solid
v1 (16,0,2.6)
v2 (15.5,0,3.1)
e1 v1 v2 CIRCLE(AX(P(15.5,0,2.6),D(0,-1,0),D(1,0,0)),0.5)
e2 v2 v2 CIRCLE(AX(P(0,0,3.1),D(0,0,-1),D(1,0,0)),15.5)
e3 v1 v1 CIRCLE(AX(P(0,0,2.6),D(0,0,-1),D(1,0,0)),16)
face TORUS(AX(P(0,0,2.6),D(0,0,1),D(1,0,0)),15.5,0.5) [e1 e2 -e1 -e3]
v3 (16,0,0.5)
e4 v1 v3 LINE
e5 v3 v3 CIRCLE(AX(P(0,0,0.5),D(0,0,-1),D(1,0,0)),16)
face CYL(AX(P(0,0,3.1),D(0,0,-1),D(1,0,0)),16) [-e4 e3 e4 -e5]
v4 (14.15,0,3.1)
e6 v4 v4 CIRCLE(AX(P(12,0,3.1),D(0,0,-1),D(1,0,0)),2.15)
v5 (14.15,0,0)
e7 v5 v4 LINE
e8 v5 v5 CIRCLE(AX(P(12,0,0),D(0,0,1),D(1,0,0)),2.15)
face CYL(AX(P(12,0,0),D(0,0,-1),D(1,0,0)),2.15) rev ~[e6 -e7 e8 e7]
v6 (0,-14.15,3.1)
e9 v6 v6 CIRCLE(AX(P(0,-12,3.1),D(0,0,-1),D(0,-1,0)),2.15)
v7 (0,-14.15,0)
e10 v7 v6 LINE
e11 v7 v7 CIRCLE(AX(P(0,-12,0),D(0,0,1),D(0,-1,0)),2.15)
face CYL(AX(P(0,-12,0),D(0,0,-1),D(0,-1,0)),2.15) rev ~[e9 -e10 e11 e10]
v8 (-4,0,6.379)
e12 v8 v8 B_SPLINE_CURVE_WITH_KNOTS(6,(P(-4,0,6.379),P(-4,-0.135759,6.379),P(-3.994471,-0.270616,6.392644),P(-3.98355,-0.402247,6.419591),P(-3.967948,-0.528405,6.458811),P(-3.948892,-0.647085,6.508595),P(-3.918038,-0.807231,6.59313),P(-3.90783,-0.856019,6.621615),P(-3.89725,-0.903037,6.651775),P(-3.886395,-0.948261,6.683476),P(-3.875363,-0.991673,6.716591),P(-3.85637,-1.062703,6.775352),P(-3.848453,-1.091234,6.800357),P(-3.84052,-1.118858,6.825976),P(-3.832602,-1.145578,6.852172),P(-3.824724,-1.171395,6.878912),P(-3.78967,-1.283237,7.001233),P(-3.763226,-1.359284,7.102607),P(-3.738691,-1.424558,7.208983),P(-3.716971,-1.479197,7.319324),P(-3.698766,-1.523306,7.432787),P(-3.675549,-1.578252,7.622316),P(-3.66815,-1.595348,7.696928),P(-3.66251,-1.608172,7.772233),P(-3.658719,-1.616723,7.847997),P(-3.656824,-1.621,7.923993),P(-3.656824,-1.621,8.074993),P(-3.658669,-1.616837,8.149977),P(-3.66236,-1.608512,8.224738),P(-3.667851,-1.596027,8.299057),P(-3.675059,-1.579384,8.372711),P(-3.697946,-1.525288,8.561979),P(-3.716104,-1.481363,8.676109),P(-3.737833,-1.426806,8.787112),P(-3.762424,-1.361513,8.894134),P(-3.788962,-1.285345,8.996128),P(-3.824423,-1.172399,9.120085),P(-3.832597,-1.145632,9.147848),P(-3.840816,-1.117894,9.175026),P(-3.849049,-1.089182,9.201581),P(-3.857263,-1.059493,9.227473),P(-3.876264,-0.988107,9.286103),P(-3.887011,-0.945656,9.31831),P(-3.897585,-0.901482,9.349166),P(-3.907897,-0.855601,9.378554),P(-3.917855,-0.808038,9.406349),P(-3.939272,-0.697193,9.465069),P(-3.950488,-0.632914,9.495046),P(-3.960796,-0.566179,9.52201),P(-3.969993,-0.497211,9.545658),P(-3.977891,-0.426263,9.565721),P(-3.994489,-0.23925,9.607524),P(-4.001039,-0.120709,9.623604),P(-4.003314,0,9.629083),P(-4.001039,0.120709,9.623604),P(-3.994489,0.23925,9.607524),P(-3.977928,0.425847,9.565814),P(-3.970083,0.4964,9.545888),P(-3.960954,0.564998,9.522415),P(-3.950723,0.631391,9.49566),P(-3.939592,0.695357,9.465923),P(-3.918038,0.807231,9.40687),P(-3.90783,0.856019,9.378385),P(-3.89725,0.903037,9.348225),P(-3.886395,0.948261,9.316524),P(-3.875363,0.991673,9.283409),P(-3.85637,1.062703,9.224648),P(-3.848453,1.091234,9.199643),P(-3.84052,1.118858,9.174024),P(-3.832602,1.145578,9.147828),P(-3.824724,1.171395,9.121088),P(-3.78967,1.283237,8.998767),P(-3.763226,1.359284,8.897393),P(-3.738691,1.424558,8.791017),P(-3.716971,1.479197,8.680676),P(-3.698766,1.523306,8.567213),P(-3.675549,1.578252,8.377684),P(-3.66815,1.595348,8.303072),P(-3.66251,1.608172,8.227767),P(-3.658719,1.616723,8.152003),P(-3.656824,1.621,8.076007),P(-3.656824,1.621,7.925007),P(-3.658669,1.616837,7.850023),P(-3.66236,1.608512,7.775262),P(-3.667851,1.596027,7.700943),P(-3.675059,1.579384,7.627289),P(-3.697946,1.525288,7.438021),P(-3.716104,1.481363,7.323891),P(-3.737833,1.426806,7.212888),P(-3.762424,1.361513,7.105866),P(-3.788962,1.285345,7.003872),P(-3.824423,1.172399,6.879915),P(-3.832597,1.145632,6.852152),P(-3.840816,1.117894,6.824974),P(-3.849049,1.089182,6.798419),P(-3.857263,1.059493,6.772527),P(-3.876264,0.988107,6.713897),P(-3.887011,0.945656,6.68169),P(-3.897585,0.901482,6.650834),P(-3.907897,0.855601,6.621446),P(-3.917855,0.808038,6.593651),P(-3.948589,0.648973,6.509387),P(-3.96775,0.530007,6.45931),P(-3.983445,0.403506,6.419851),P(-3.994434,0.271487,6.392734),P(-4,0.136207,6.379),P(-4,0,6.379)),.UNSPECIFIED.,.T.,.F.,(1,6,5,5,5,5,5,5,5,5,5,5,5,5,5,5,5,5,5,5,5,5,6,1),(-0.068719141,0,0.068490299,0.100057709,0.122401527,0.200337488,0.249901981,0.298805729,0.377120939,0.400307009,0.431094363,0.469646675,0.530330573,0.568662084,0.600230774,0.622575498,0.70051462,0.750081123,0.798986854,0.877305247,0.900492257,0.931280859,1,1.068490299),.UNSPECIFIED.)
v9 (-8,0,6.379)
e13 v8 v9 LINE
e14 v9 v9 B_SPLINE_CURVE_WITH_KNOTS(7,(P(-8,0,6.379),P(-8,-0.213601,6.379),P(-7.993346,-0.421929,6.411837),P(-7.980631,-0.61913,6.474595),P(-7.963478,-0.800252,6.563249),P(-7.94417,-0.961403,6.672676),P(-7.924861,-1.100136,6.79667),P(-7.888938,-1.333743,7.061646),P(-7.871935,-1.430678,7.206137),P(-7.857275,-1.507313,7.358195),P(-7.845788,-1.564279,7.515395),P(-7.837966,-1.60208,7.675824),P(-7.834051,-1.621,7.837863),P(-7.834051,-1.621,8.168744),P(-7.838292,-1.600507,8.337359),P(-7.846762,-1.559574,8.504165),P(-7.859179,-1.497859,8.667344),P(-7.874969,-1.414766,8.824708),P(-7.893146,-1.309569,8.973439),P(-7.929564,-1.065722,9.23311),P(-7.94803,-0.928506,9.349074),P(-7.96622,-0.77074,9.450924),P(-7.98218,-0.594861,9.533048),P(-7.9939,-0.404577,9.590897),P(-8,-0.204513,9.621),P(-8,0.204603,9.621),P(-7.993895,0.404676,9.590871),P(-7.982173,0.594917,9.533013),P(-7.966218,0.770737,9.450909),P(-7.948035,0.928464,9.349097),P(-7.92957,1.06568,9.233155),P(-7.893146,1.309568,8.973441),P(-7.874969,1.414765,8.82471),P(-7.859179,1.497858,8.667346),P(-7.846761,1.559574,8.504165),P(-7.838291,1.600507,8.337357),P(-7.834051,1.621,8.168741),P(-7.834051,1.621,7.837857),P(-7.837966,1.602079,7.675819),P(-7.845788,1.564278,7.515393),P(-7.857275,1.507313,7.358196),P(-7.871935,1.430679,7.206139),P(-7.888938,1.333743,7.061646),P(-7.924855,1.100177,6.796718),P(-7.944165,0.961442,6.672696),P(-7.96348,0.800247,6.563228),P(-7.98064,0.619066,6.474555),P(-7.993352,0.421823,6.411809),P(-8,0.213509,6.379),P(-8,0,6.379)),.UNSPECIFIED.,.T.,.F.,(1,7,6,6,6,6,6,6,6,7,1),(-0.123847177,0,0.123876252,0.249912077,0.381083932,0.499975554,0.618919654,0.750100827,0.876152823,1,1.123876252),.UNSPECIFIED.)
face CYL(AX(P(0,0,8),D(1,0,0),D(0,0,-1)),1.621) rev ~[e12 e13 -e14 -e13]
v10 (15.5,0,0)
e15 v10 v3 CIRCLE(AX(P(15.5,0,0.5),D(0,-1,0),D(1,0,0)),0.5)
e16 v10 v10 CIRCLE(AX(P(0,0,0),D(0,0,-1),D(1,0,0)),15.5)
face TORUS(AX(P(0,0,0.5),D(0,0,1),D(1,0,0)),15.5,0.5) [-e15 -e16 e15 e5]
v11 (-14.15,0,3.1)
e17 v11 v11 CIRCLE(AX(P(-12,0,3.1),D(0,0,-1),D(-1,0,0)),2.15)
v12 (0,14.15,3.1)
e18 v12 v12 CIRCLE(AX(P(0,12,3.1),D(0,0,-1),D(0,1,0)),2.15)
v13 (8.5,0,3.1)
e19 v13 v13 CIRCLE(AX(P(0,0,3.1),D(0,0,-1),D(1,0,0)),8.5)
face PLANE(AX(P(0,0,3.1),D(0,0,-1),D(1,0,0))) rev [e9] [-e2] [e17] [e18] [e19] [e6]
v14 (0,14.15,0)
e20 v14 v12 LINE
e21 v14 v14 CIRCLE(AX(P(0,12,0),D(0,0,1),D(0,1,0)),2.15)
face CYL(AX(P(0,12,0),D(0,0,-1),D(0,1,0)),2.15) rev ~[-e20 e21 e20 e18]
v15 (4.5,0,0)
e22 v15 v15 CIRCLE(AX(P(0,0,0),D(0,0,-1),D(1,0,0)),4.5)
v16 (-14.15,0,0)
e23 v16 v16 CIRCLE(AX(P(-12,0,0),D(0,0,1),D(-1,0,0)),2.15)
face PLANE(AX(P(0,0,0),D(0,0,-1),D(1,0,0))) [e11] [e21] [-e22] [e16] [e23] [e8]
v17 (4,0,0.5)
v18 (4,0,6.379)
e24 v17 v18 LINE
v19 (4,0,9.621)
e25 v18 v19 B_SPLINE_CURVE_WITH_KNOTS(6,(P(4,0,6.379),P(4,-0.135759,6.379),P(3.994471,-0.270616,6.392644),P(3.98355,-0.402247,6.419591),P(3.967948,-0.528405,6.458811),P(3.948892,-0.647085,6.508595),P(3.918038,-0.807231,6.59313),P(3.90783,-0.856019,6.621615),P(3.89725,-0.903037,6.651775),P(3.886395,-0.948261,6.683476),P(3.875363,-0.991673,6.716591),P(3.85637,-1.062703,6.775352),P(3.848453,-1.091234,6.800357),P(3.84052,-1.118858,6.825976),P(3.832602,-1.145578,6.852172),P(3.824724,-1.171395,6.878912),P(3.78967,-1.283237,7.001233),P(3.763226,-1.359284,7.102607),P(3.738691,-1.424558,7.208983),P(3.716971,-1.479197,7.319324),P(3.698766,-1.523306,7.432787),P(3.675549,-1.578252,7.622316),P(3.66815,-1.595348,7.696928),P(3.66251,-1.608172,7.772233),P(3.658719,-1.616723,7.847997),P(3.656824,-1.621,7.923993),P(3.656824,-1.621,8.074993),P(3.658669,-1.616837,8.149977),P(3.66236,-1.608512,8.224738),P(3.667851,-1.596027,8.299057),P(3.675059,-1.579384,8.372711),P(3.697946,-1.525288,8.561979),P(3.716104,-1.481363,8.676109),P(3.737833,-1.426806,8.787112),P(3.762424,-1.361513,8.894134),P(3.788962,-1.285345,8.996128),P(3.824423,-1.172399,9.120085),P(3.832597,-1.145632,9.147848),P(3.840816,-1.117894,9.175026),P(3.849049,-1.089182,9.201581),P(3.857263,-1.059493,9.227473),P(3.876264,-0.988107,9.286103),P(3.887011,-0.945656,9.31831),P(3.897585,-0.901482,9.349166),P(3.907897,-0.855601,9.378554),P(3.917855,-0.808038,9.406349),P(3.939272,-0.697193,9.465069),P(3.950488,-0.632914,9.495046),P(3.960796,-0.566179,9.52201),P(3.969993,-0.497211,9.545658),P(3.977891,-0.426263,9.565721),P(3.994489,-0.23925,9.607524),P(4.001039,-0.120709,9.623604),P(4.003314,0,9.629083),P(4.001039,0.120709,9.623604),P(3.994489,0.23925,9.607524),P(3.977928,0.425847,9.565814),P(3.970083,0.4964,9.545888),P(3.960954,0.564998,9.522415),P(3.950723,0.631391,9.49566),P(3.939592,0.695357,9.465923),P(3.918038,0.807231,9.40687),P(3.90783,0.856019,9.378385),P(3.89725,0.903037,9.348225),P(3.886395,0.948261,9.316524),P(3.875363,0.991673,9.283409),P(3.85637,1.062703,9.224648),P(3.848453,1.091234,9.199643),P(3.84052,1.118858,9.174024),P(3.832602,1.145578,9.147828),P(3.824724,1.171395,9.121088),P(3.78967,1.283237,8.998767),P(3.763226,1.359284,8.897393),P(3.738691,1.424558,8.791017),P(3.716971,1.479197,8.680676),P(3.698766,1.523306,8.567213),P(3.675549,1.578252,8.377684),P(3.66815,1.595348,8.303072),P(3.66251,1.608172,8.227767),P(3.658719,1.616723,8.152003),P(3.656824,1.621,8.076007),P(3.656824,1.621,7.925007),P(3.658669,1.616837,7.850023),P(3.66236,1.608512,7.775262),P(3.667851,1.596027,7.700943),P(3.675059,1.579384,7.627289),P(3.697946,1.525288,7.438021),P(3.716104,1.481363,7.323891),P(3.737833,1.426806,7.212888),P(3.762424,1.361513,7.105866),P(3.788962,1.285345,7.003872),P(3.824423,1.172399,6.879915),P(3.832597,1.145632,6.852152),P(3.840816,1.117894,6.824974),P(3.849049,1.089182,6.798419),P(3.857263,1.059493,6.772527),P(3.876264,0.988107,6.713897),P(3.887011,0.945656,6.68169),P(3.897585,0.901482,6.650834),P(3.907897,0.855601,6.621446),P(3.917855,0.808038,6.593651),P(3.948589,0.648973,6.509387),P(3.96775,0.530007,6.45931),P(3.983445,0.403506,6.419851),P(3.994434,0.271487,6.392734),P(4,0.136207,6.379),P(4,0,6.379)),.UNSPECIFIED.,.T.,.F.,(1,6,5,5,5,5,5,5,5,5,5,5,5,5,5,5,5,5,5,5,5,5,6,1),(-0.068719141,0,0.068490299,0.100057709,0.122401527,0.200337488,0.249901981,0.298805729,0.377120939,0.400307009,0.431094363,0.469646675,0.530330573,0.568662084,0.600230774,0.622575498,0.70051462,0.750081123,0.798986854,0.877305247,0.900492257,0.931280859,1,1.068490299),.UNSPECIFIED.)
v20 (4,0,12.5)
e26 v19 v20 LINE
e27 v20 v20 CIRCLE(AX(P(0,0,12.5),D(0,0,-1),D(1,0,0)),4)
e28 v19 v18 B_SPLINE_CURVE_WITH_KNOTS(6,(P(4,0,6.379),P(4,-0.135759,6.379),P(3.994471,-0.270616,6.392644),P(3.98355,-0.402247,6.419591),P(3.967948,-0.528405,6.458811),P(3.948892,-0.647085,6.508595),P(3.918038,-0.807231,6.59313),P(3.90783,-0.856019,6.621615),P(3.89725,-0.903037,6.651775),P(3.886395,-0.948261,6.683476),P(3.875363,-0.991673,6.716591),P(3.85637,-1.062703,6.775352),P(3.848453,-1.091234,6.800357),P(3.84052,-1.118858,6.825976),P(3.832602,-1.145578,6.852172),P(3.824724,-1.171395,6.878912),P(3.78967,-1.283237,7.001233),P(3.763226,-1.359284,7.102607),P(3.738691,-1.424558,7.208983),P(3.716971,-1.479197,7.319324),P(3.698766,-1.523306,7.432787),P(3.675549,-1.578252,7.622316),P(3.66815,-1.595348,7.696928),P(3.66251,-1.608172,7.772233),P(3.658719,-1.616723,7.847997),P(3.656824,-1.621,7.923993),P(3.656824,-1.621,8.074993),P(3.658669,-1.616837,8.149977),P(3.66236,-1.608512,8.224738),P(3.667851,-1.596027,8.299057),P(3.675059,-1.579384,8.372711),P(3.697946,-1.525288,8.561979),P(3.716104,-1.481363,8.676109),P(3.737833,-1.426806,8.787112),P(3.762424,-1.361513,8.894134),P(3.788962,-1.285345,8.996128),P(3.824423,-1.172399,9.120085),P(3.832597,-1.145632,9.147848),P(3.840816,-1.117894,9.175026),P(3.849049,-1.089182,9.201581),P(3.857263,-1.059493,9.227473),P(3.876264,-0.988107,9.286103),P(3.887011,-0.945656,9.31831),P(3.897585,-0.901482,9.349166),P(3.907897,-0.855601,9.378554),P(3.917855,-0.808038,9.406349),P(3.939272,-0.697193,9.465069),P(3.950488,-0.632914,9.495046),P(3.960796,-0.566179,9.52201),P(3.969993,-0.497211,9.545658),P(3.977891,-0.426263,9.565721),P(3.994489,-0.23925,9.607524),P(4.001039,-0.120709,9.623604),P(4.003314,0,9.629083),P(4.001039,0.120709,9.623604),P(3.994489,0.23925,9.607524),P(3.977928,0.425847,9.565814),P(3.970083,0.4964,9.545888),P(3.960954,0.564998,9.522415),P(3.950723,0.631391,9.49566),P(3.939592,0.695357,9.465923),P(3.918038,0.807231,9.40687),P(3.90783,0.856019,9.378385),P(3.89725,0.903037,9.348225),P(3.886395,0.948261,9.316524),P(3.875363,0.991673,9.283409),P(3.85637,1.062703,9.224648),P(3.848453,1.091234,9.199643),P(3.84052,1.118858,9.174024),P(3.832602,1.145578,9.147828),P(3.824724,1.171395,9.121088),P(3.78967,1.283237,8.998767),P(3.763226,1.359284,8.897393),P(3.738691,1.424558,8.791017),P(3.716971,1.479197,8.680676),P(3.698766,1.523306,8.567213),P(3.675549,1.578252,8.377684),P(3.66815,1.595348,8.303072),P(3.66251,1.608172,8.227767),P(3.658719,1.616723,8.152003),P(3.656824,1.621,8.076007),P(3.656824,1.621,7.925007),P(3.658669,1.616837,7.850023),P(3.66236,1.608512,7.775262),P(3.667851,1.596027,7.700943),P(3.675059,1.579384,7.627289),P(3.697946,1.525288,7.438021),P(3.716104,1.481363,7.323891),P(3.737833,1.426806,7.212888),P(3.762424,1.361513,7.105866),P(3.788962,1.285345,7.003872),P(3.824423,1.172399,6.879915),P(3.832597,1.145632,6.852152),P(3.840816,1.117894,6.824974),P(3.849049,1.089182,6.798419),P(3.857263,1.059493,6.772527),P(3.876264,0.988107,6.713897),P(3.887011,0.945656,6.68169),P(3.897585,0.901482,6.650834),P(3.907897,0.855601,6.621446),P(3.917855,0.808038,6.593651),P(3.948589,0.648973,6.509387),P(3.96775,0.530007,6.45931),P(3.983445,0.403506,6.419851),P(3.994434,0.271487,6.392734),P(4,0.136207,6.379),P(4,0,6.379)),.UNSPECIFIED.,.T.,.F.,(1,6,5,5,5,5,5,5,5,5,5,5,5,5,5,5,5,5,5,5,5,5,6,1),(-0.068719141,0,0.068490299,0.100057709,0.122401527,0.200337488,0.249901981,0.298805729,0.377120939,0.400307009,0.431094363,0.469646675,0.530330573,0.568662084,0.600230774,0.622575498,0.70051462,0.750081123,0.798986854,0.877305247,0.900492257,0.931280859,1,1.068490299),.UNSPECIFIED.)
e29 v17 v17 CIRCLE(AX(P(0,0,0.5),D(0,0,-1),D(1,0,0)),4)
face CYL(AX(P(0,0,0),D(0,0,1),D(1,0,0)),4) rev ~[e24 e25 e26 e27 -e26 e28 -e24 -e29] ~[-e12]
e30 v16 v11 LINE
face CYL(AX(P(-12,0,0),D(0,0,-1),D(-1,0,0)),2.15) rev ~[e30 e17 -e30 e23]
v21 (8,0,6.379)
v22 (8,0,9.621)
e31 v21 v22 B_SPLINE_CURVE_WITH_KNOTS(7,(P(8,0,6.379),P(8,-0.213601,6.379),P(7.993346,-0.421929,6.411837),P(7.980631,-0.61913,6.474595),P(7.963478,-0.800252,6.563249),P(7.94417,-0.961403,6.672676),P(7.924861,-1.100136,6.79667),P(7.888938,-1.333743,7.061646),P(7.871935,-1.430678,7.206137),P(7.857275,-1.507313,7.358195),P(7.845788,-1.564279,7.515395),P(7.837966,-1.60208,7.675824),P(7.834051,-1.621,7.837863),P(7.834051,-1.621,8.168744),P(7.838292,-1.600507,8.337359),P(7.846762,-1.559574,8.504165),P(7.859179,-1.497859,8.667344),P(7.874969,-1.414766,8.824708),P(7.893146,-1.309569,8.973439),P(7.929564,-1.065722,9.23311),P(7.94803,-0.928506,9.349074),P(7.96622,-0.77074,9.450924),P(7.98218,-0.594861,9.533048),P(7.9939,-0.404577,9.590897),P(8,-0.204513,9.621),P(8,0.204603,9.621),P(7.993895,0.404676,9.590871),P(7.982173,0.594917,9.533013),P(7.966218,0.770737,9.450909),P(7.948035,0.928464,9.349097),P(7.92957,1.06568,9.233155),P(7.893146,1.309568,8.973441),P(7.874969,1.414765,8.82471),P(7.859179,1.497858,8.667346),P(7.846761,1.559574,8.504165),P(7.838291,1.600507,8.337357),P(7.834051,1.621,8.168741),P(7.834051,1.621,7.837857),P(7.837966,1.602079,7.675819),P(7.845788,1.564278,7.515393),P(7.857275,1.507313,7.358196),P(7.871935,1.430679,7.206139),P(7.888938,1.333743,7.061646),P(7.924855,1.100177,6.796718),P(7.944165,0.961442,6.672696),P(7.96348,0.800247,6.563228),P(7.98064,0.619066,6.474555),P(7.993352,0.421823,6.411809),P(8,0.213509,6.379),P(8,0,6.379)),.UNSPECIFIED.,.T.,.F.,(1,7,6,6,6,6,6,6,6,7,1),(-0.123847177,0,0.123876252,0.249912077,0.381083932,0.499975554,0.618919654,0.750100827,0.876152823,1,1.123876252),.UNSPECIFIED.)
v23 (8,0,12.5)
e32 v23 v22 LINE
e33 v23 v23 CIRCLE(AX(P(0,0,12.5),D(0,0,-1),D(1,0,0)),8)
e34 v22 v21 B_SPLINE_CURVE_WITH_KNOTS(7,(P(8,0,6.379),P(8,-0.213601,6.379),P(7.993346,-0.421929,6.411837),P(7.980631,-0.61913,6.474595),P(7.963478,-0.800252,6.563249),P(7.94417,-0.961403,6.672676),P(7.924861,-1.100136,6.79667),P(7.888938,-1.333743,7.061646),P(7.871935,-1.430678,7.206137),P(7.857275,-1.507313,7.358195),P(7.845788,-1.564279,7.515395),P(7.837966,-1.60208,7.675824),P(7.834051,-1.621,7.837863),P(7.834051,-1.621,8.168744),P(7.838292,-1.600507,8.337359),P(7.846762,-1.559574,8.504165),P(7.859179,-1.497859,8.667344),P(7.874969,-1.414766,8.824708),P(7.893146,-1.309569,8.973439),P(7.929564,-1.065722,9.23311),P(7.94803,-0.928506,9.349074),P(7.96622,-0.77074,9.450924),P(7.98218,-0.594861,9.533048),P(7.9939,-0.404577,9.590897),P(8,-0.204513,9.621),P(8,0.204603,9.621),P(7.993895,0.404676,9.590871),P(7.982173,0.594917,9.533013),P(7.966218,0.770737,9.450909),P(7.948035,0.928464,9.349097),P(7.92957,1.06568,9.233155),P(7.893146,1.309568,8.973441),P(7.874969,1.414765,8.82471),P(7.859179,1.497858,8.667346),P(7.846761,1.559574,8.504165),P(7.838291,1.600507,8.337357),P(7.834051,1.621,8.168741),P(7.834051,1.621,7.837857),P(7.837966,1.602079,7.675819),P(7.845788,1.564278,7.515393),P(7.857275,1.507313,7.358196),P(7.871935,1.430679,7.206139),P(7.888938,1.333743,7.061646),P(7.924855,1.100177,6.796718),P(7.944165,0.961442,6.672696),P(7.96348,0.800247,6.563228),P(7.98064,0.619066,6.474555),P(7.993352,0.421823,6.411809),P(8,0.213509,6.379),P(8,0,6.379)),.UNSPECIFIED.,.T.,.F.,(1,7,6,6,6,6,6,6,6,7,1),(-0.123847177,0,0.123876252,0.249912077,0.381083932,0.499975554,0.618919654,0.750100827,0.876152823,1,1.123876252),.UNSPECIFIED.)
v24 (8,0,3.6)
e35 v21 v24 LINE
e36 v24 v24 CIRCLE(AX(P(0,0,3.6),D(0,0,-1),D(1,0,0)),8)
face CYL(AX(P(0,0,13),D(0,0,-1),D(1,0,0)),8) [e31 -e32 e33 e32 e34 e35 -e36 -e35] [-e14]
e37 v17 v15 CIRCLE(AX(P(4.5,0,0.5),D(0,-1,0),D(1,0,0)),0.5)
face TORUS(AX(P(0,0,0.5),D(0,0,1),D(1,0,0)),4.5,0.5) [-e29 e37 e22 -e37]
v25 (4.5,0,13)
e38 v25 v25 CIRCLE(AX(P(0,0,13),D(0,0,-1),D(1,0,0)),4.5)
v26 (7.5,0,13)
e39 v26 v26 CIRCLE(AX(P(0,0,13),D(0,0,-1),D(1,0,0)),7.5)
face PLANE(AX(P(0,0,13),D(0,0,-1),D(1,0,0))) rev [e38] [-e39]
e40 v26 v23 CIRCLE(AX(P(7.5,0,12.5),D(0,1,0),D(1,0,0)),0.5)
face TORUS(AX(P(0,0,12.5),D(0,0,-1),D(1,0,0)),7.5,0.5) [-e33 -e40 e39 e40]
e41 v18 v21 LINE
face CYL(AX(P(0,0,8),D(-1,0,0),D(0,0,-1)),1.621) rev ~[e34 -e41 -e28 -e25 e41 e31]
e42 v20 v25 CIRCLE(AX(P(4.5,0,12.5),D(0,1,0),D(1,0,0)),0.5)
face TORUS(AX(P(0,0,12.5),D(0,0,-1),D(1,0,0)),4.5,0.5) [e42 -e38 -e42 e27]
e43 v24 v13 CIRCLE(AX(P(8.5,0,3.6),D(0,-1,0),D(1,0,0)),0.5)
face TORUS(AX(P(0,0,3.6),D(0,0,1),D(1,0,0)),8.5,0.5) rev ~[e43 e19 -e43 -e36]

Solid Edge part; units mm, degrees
sketch "Sketch1" plane through (0, 0, 0) normal (0, -1, 0) x (1, 0, 0)
  line L0 (4, 0) -> (4, 13)
  line L1 (4, 13) -> (8, 13)
  line L2 (8, 13) -> (8, 3.1)
  line L3 (8, 3.1) -> (16, 3.1)
  line L4 (16, 3.1) -> (16, 0)
  line L5 (16, 0) -> (4, 0)
  dimension "D1" = 3.1
  dimension "D2" = 13
revolve "RevolvedProtrusion1" add sketch "Sketch1" angle 360 about axis through (0, 0, 54) along (0, 0, -1)
hole "mounting_hole" at (0, 12, 0) direction (0, 0, 1) diameter 4.3 end up to next
pattern_circular "Pattern1" count 4 over 360 about axis through (0, 0, 3.1) along (0, 0, 1) of "mounting_hole"
fillet "Round1" radius 0.5 6 edges at (-8, 0, 13) (-4, 0, 13) (-8, 0, 3.1) (-16, 0, 3.1) (-16, 0, 0) (-4, 0, 0)
hole "worm_screw_hole" at (0, 0, 8) direction (-1, 0, 0) diameter 3.242 end up to next
mirror "Mirror1" about plane through (0, 0, 0) normal (1, 0, 0) of "worm_screw_hole"
properties material "X5CrNi18-8"
